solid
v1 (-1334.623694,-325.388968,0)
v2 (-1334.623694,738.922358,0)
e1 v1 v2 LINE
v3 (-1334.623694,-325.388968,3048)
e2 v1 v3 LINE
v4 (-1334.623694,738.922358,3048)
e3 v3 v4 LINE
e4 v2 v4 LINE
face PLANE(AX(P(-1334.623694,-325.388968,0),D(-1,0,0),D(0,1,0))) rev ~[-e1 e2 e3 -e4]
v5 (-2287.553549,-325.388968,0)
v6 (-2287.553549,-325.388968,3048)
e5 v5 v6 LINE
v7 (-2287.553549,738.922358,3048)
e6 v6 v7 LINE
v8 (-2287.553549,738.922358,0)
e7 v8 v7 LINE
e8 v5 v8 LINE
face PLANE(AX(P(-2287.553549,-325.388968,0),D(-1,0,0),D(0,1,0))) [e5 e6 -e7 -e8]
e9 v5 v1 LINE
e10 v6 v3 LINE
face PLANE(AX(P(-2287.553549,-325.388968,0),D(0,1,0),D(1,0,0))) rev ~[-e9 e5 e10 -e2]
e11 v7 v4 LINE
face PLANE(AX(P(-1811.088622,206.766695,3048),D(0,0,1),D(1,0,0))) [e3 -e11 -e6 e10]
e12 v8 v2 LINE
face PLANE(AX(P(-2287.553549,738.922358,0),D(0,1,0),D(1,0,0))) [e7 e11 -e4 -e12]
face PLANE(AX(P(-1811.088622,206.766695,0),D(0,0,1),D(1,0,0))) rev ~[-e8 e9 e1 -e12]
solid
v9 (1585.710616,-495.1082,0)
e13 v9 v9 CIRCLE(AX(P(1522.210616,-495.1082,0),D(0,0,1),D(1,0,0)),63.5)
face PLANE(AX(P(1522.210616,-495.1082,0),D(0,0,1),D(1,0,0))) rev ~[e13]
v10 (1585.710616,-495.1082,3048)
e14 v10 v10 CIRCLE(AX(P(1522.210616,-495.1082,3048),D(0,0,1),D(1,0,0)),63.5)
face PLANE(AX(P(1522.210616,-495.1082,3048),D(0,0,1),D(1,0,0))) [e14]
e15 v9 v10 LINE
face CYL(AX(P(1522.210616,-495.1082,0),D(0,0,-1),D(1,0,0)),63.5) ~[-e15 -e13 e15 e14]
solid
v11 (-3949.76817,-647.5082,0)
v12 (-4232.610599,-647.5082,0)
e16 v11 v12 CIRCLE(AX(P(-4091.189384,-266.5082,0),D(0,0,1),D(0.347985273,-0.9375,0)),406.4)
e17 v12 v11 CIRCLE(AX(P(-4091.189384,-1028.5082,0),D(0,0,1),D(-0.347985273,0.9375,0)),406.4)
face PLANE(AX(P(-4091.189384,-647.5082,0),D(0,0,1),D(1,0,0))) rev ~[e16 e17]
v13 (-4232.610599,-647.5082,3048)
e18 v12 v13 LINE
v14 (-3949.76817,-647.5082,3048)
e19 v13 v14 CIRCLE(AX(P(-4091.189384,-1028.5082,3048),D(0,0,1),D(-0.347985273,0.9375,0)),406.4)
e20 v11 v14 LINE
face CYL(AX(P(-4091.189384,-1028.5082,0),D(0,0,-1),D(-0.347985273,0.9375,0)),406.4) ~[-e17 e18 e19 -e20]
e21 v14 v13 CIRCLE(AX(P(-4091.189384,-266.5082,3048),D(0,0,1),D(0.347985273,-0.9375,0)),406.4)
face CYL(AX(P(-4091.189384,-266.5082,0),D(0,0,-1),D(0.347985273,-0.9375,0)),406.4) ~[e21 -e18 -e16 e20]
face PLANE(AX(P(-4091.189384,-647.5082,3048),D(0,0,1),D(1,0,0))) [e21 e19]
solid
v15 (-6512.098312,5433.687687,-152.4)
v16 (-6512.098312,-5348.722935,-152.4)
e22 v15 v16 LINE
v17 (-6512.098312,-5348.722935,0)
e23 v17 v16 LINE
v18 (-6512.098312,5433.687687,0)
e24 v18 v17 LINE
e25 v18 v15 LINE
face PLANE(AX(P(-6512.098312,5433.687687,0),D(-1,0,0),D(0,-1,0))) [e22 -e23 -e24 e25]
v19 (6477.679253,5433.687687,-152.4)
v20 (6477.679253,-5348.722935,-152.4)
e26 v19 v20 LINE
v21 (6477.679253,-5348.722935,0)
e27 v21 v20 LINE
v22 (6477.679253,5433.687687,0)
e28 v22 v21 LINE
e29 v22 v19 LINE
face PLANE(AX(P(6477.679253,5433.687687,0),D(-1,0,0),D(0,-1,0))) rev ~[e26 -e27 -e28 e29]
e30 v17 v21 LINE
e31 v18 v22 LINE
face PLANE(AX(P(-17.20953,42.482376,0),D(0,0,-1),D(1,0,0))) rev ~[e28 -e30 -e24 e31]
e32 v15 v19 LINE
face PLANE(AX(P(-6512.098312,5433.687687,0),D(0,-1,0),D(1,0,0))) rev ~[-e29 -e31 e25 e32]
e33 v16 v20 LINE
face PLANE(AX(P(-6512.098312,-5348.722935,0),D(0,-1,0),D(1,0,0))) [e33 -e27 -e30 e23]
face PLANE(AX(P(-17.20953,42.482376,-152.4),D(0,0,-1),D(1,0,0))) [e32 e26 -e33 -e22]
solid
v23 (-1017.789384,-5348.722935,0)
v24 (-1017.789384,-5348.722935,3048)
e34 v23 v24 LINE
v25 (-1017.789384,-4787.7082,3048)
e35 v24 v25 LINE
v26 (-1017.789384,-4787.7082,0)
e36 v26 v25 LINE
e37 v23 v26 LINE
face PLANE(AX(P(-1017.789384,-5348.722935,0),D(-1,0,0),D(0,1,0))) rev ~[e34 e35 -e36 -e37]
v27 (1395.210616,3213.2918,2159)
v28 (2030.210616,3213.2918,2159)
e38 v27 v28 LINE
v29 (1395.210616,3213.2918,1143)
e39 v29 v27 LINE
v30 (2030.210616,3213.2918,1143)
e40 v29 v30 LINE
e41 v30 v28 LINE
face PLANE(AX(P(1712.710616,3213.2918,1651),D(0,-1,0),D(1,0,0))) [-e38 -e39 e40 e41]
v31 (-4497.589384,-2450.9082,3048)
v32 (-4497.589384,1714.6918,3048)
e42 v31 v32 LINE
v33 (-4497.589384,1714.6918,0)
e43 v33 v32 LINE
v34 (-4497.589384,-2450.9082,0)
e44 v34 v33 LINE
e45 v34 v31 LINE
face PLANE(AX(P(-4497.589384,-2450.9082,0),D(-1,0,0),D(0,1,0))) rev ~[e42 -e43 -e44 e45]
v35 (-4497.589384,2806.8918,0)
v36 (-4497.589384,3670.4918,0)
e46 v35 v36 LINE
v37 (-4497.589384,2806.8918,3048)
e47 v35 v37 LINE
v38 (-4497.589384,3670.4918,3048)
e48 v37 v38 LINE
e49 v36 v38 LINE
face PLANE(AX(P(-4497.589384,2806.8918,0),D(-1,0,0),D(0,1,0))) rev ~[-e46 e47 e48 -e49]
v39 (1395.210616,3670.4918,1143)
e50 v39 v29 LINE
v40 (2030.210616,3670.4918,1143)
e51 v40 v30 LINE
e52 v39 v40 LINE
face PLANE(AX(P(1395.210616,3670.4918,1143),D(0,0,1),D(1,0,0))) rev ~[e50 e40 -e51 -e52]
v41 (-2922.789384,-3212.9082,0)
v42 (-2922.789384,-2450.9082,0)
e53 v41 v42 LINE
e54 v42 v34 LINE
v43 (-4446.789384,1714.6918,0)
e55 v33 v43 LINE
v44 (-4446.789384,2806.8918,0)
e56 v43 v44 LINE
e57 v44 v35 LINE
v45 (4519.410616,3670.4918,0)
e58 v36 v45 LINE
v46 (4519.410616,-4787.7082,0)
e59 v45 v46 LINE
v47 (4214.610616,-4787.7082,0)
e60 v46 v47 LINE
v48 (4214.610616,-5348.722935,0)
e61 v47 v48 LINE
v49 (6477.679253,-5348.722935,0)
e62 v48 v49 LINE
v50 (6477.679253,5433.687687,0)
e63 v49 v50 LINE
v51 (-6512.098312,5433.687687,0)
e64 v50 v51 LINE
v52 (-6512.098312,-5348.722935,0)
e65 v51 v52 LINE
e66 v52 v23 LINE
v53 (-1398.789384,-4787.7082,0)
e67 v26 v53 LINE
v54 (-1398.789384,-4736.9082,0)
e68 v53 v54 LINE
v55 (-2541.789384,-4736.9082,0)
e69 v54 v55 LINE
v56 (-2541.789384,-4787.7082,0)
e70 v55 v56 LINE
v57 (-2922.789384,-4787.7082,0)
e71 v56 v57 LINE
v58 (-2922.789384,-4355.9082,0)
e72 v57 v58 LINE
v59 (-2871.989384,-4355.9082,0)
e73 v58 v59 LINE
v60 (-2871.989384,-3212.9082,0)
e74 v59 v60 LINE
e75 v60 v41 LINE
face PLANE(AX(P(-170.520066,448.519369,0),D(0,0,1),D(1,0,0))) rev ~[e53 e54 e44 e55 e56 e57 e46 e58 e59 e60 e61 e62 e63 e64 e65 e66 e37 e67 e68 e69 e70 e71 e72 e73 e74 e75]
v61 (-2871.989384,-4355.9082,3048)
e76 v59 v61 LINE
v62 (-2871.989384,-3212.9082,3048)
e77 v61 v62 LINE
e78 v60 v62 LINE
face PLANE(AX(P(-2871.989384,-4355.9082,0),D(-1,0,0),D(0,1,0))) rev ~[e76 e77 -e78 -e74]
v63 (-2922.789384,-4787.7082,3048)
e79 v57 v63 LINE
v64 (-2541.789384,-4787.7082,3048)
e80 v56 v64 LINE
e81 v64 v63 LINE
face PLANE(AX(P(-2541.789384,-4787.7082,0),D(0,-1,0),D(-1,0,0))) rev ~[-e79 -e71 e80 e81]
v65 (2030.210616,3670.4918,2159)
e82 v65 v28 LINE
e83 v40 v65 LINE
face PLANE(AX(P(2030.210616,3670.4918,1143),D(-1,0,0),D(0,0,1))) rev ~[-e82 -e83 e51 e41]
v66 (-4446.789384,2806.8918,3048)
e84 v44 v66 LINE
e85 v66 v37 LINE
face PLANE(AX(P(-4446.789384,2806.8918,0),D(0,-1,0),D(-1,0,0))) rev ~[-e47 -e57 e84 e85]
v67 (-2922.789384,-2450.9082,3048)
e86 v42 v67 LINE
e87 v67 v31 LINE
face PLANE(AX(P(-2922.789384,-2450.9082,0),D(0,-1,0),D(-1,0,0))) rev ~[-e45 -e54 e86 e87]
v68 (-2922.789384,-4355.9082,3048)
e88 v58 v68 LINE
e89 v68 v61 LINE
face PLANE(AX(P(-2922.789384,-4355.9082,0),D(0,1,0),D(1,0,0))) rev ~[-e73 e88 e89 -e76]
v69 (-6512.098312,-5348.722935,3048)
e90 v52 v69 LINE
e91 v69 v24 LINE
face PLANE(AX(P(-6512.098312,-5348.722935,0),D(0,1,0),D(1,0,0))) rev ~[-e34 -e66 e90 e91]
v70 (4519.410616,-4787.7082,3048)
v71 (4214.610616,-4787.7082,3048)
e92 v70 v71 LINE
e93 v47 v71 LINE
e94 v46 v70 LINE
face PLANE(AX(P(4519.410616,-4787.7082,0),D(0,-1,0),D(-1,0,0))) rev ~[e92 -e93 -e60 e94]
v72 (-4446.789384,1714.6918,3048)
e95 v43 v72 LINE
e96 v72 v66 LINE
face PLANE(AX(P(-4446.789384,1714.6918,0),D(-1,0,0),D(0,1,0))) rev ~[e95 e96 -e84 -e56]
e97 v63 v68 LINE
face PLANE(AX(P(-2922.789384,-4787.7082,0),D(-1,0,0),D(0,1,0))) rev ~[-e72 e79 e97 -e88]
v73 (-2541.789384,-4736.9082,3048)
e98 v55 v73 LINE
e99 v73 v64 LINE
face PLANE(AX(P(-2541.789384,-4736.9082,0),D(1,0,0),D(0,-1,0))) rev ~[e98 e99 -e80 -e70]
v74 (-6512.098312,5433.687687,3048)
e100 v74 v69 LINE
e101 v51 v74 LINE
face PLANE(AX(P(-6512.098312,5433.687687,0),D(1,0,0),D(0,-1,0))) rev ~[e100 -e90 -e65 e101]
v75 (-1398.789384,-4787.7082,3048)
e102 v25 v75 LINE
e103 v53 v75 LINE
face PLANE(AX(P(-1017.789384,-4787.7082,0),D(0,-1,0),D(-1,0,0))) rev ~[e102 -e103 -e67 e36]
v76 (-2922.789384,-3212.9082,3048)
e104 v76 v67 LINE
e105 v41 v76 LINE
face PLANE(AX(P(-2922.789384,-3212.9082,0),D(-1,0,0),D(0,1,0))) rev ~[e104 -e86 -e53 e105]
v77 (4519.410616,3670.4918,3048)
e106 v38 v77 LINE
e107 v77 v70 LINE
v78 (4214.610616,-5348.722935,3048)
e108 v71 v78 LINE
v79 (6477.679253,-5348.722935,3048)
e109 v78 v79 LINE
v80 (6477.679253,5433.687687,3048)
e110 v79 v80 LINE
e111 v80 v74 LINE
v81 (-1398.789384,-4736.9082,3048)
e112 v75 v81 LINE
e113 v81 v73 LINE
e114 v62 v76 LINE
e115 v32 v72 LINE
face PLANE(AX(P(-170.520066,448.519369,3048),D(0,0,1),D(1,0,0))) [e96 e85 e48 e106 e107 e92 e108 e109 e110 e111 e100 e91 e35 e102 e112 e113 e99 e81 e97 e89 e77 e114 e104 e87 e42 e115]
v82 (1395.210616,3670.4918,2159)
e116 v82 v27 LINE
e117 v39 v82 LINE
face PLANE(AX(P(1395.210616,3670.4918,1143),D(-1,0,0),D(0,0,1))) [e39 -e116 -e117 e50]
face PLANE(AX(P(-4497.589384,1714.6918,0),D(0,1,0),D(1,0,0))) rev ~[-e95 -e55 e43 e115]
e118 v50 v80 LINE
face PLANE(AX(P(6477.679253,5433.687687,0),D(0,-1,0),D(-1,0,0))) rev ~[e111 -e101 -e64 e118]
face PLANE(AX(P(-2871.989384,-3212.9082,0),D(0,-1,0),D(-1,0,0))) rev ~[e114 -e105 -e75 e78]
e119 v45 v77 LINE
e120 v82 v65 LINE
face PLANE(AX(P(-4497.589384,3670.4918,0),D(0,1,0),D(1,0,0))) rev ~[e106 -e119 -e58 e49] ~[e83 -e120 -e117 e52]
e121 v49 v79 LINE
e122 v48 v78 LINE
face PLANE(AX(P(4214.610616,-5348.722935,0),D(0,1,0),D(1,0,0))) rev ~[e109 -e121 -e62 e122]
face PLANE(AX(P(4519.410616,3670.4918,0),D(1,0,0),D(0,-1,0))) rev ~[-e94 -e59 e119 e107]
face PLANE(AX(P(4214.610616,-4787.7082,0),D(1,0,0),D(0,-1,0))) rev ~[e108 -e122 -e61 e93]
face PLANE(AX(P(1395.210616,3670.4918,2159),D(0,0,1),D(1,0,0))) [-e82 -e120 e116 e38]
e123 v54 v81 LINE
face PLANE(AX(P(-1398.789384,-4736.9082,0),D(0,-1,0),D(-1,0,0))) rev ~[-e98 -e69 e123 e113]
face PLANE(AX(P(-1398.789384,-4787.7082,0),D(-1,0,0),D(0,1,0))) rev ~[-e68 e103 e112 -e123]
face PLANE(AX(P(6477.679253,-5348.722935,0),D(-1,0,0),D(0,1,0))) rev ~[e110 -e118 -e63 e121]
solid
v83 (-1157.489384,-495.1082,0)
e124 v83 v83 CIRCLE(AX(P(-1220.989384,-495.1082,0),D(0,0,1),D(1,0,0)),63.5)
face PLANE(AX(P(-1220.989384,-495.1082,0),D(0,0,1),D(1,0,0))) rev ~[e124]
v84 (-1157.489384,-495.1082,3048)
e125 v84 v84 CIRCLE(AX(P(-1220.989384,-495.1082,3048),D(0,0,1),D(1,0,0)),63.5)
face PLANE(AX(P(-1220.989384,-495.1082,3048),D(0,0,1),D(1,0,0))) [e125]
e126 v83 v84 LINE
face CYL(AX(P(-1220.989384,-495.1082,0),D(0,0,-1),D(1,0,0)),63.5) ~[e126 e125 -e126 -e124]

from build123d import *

# Parameters (mm, degrees)
F1_DEPTH = 3048
F0_R     = 63.5
F0_W     = 952.929854393
F0_H     = 1064.3113255501
F2_W     = 12989.7775650024
F2_H     = 10782.4106216431
F3_DEPTH = 152.4
F4_W     = 635
F4_H     = 1016
F5_DEPTH = 457.2


with BuildPart() as f1:
    # F0 (on Top) → F1 (new body)
    with BuildSketch(Plane.XY):
        Polygon((-4497.5893844604, 2806.8917998496), (-4497.5893844604, 3670.4917998496), (1395.2106155395, 3670.4917998496), (2030.2106155395, 3670.4917998496), (4519.4106155395, 3670.4917998496), (4519.4106155396, -4787.7082001504), (4214.6106155396, -4787.7082001504), (4214.6106155396, -5348.7229347229), (6477.6792526245, -5348.7229347229), (6477.6792526245, 5433.6876869202), (-6512.0983123779, 5433.6876869202), (-6512.0983123779, -4787.7082001504), (-6512.0983123779, -5348.7229347229), (-1017.7893844604, -5348.7229347229), (-1017.7893844604, -4787.7082001504), (-1398.7893844604, -4787.7082001504), (-1398.7893844604, -4736.9082001504), (-2541.7893844604, -4736.9082001504), (-2541.7893844604, -4787.7082001504), (-2922.7893844604, -4787.7082001504), (-2922.7893844604, -4355.9082001504), (-2871.9893844604, -4355.9082001504), (-2871.9893844604, -3212.9082001504), (-2922.7893844604, -3212.9082001504), (-2922.7893844604, -2450.9082001504), (-4497.5893844604, -2450.9082001504), (-4497.5893844604, -1434.9082001504), (-4497.5893844604, -1028.5082001504), (-4497.5893844604, -266.5082001504), (-4497.5893844604, 139.8917998496), (-4497.5893844604, 1714.6917998496), (-4446.7893844605, 1714.6917998496), (-4446.7893844605, 2806.8917998496), align=None)
    extrude(amount=F1_DEPTH)

    # F4 (on face) → F5 (join)
    with BuildSketch(Plane.XZ.offset(-3670.4917998496)):
        with Locations((1712.7106155396, 1651)):
            Rectangle(F4_W, F4_H)
    extrude(amount=F5_DEPTH)


with BuildPart() as f1b:
    # F0 (on Top) → F1, piece 2 (new body)
    with BuildSketch(Plane.XY):
        with Locations((1522.2106155396, -495.1082001504)):
            Circle(F0_R)
    extrude(amount=F1_DEPTH)


with BuildPart() as f1c:
    # F0 (on Top) → F1, piece 3 (new body)
    with BuildSketch(Plane.XY):
        with Locations((-1811.0886216164, 206.7666947842)):
            Rectangle(F0_W, F0_H)
    extrude(amount=F1_DEPTH)


with BuildPart() as f1d:
    # F0 (on Top) → F1, piece 4 (new body)
    with BuildSketch(Plane.XY):
        with BuildLine():
            ThreePointArc((-3949.7681696446, -647.5082001504), (-3859.1469548287, 67.1342294814), (-4497.5893844604, -266.5082001504))
            ThreePointArc((-4497.5893844604, -266.5082001504), (-4424.8318140922, -498.5506297821), (-4232.6105992763, -647.5082001504))
            ThreePointArc((-4232.6105992763, -647.5082001504), (-4424.8318140922, -796.4657705186), (-4497.5893844604, -1028.5082001504))
            ThreePointArc((-4497.5893844604, -1028.5082001504), (-3859.1469548287, -1362.1506297821), (-3949.7681696446, -647.5082001504))
        make_face()
    extrude(amount=F1_DEPTH)


with BuildPart() as f1e:
    # F0 (on Top) → F1, piece 5 (new body)
    with BuildSketch(Plane.XY):
        with Locations((-1220.9893844604, -495.1082001504)):
            Circle(F0_R)
    extrude(amount=F1_DEPTH)


with BuildPart() as f3:
    # F2 (on face) → F3 (new body)
    with BuildSketch(Plane(origin=(0, 0, 0), x_dir=(1, 0, 0), z_dir=(0, 0, -1))):
        with Locations((-17.2095298767, -42.4823760986)):
            Rectangle(F2_W, F2_H)
    extrude(amount=F3_DEPTH)


solid = Compound([f1.part, f1b.part, f1c.part, f1d.part, f1e.part, f3.part])
